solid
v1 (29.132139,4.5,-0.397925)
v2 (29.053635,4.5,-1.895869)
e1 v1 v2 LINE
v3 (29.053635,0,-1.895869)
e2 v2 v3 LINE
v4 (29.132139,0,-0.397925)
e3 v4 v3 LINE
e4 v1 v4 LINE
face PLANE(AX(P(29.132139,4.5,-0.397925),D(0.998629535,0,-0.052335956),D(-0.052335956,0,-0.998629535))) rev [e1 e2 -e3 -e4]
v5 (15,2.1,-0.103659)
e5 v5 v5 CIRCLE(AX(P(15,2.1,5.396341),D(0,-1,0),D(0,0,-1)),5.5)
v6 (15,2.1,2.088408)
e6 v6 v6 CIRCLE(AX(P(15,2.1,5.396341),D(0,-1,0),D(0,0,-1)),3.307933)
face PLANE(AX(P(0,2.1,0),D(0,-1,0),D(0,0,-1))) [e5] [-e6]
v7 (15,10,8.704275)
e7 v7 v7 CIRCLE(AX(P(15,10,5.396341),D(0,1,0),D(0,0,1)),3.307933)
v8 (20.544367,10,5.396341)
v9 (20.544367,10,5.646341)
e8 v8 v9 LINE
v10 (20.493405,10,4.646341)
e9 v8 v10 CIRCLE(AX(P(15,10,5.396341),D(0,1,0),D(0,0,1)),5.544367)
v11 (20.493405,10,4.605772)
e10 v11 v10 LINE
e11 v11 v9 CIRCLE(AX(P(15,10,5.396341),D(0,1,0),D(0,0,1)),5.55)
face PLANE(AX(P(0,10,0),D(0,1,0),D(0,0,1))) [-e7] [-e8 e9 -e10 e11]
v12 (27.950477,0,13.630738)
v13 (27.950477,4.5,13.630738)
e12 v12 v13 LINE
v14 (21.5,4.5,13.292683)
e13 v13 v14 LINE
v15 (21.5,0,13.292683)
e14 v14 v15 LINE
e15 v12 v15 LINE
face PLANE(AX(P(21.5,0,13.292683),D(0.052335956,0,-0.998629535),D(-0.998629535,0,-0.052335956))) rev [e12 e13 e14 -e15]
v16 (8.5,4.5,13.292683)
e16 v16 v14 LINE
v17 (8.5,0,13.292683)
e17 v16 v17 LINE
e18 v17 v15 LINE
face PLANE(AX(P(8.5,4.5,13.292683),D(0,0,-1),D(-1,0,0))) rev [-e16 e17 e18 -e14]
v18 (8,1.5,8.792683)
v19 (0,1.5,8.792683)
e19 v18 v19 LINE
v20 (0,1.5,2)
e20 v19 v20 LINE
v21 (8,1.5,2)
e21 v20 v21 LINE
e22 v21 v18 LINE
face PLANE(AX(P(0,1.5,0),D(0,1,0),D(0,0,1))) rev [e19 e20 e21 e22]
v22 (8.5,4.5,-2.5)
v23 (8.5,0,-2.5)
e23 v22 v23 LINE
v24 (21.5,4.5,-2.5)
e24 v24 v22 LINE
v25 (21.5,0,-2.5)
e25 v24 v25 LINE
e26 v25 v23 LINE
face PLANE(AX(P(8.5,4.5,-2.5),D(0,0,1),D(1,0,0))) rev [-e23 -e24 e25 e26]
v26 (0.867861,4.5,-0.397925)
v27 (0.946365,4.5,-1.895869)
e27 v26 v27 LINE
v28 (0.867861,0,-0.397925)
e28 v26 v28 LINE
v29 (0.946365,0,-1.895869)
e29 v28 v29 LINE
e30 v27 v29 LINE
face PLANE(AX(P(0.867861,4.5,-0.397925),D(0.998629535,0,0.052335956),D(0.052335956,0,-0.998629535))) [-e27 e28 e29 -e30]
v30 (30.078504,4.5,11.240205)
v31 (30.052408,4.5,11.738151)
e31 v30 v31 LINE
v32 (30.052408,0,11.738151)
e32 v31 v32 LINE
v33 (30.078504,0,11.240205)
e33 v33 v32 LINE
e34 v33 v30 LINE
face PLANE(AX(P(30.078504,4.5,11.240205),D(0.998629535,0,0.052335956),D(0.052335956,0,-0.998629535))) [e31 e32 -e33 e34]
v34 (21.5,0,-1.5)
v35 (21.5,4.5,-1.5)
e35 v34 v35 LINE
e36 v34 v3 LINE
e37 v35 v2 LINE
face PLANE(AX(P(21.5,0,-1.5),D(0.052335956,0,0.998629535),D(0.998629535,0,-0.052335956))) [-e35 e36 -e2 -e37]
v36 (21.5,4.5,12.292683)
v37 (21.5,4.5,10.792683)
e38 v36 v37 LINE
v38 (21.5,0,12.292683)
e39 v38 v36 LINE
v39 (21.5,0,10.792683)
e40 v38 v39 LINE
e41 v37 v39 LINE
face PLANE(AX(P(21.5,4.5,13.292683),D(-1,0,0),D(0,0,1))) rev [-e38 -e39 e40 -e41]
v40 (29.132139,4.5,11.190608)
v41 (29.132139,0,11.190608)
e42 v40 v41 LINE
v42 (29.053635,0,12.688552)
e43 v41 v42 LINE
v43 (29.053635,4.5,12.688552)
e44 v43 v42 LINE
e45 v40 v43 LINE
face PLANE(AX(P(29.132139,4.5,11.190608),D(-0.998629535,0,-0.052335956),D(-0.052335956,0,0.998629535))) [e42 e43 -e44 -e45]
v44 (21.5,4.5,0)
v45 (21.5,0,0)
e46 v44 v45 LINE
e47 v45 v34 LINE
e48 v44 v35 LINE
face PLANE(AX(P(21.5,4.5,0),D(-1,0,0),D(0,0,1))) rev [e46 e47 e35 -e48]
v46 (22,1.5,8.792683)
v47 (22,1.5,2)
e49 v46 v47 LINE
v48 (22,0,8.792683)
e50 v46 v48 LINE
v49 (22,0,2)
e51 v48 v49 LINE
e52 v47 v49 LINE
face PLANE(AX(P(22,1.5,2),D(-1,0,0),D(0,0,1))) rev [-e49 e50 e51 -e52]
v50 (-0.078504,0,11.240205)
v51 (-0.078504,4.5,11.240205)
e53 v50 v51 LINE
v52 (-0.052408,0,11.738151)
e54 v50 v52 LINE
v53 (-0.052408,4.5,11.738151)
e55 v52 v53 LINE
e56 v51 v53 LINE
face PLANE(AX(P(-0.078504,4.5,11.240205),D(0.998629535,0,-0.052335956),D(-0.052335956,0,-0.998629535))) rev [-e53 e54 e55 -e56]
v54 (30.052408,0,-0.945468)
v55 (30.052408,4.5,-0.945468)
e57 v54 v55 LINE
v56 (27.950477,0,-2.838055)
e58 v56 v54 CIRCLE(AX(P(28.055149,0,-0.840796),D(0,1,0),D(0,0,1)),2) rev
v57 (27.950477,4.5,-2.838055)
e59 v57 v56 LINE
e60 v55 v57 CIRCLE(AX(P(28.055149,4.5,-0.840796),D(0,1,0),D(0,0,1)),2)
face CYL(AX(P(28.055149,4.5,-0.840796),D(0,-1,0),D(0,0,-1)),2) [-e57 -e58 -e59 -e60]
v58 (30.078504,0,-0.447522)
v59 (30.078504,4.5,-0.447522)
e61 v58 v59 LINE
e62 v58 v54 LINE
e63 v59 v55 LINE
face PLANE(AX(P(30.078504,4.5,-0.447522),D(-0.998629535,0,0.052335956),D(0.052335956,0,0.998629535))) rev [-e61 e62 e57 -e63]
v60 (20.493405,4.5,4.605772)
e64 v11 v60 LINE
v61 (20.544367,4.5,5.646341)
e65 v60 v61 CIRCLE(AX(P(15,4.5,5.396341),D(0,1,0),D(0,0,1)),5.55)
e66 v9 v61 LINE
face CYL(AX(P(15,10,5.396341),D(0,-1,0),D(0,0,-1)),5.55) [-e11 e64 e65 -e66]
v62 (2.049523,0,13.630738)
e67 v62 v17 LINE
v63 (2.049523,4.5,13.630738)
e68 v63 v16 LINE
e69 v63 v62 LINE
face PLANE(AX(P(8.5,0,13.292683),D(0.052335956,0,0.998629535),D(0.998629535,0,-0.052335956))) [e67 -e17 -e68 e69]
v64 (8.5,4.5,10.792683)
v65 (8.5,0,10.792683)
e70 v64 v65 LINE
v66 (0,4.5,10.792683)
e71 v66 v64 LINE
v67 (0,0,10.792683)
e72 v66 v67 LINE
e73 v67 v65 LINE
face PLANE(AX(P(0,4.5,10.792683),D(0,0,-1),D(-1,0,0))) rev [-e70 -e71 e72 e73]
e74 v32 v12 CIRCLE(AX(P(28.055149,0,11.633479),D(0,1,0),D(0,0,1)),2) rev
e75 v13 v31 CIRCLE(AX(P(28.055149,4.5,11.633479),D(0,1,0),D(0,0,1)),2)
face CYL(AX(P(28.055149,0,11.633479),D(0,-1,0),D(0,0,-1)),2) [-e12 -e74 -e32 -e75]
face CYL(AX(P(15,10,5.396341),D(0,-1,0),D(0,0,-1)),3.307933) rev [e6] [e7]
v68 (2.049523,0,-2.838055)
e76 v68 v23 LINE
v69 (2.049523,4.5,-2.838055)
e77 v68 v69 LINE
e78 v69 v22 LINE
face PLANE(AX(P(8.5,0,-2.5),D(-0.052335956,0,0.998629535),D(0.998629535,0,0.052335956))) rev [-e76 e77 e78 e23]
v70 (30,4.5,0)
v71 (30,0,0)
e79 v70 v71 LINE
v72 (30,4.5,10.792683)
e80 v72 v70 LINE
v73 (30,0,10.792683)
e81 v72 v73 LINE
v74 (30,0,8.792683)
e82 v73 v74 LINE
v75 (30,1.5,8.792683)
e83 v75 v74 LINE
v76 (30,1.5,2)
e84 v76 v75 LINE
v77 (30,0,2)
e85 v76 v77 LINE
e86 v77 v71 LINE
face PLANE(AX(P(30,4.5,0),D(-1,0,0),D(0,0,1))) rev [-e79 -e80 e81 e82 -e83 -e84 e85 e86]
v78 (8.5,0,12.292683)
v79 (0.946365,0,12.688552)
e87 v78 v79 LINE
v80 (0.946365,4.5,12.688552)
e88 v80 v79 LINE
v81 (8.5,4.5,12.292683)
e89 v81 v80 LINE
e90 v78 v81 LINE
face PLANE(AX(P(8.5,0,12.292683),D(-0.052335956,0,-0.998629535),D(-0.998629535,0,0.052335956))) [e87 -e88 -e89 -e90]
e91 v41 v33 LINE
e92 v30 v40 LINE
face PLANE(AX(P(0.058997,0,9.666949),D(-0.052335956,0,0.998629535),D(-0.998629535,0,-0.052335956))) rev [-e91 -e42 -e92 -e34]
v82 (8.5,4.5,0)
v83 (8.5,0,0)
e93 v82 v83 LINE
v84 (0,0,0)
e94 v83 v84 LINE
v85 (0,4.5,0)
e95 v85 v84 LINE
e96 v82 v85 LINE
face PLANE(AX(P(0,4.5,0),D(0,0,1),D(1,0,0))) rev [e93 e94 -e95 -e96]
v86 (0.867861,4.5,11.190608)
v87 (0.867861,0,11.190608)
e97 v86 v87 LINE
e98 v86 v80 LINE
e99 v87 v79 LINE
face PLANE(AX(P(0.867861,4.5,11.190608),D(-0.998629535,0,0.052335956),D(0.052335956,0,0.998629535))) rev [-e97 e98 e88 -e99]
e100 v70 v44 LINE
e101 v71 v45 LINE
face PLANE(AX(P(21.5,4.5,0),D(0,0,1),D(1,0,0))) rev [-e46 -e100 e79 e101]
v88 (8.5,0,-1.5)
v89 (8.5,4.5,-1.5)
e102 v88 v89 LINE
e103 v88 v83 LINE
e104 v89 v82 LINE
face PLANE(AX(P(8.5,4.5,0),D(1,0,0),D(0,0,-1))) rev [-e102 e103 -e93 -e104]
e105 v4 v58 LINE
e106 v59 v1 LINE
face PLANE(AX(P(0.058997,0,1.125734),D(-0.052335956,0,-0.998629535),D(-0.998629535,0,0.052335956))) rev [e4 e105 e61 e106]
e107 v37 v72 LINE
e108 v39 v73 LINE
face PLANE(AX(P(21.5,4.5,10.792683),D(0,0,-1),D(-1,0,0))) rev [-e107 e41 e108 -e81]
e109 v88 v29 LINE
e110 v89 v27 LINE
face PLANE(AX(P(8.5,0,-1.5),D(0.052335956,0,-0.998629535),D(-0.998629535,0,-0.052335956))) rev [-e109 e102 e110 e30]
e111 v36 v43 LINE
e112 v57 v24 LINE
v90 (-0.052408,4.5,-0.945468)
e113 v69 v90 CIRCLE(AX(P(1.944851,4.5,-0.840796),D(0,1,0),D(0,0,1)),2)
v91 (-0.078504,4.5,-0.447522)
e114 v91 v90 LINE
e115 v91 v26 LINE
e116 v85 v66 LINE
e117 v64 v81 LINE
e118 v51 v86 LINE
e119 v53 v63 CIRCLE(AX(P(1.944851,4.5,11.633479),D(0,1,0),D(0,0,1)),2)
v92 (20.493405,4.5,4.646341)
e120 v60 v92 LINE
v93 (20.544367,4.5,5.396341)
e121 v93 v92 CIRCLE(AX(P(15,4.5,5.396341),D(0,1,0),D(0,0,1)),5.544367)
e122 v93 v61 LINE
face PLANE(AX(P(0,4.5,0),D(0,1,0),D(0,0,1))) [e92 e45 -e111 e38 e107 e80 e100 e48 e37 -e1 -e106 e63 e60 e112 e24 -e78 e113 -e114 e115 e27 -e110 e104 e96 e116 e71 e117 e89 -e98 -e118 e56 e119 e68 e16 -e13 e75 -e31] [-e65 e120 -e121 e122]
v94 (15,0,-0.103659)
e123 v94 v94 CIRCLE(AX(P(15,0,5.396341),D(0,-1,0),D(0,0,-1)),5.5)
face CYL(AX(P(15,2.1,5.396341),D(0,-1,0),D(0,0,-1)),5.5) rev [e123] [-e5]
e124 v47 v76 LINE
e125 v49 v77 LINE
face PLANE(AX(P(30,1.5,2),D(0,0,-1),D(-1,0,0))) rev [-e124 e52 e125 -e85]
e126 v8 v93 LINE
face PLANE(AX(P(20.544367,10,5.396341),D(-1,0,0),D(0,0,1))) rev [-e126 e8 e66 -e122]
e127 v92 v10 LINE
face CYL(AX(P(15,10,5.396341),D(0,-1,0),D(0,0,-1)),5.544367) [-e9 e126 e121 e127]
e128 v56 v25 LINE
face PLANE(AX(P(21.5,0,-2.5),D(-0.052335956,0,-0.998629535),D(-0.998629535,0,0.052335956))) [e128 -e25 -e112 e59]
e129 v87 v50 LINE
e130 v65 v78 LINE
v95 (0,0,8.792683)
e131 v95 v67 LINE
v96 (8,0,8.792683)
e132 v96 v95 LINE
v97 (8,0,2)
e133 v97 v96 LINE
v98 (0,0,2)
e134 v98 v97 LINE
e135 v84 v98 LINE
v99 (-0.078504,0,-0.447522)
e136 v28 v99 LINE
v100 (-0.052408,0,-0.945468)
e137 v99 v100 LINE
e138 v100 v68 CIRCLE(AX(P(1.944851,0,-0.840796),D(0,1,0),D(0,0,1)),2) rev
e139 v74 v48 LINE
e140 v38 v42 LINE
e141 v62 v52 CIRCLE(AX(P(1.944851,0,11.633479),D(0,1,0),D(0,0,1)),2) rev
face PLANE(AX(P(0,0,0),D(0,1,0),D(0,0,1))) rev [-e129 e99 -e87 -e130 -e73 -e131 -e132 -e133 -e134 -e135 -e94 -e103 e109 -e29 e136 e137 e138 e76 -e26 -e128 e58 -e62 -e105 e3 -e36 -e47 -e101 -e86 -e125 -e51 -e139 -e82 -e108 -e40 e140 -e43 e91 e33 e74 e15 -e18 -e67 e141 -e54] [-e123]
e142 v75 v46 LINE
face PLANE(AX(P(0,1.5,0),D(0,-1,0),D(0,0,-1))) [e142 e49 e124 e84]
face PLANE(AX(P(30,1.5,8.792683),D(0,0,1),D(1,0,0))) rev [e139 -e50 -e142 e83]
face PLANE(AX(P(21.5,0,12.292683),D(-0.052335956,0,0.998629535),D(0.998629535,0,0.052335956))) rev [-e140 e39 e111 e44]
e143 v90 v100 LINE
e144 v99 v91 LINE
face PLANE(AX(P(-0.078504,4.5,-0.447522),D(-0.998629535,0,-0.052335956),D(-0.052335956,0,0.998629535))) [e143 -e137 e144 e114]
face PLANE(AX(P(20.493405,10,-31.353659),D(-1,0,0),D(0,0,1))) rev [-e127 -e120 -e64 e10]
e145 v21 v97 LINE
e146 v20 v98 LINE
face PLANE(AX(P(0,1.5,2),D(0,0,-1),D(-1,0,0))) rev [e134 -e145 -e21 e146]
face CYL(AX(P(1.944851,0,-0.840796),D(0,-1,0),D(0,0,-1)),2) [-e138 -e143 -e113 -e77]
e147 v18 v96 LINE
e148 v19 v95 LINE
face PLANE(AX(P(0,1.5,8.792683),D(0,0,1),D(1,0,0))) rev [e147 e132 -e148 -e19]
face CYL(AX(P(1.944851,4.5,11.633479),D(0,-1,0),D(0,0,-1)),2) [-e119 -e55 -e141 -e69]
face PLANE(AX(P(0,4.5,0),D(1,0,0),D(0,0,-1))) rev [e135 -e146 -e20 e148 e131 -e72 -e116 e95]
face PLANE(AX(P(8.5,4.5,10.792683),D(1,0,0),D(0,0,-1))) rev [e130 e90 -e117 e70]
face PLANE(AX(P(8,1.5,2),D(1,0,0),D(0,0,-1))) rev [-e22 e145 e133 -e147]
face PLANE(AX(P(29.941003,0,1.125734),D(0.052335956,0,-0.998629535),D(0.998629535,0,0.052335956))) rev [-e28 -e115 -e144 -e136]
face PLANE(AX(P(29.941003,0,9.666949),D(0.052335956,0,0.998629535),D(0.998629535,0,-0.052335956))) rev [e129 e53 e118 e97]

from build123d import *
from build123d.topology import SkipClean

# Parameters (mm, degrees)
BOSS_EXTRU_1_DEPTH       = 4.5
BOSS_EXTRU_2_DEPTH       = 5.5
ENL_V_MAT_EXTRU_3_DEPTH  = 2.1
ENL_V_START              = -13.1
ESQUISSE7_R              = 3
ENL_V_MAT_EXTRU_4_DEPTH  = 13.1
ESQUISSE18_W             = 8
ESQUISSE18_H             = 6.792682927
ENL_V_MAT_EXTRU_5_DEPTH  = 1.5
ESQUISSE19_W             = 8
ESQUISSE19_H             = 6.792682927
ENL_V_MAT_EXTRU_6_DEPTH  = 1.5
BOSS_EXTRU_11_DEPTH      = 4.5
ESQUISSE25_W             = 0.947664044
ESQUISSE25_H             = 4.5
BOSS_EXTRU_12_DEPTH      = 1.5
CONG_16_R                = 2
BOSS_EXTRU_16_DEPTH      = 1
ENL_V_MAT_EXTRU_7_DEPTH  = 0.25
CONG_16_OF_SYM_TRIE4_R   = 2
SYM_TRIE5_DEPTH          = 4.5
ESQUISSE34_W             = 0.75
ESQUISSE34_H             = 11.333514389
ENL_V_MAT_EXTRU_10_DEPTH = 36
ESQUISSE35_R             = 5.54436651
ESQUISSE35_R_2           = 3
BOSS_EXTRU_19_DEPTH      = 5.5
ESQUISSE36_W             = 0.010434814
ESQUISSE36_H             = 5.5
ENL_V_MAT_EXTRU_11_DEPTH = 0.25
BOSS_EXTRU_20_DEPTH      = 5.5
ESQUISSE38_W             = 0.005685697
ESQUISSE38_H             = 5.5
ENL_V_MAT_EXTRU_12_DEPTH = 36
ESQUISSE39_R             = 3.307933445
ENL_V_MAT_EXTRU_13_DEPTH = 5.5
ENL_V_START_2            = -36
ESQUISSE40_R             = 3.307933445
ENL_V_MAT_EXTRU_14_DEPTH = 36


with BuildPart() as part:
    # Esquisse1 → Boss.-Extru.1 (new body)
    with BuildSketch(Plane(origin=(0, 0, 0), x_dir=(1, 0, 0), z_dir=(0, 1, 0))):
        Polygon((21.5, 0), (21.5, 2.5), (8.5, 2.5), (8.5, 0), (0, 0), (0, -10.792682927), (8.5, -10.792682927), (8.5, -13.292682927), (21.5, -13.292682927), (21.5, -10.792682927), (30, -10.792682927), (30, 0), align=None)
    extrude(amount=BOSS_EXTRU_1_DEPTH)

    # Esquisse2 → Boss.-Extru.2 (add)
    with BuildSketch(Plane(origin=(0, 4.5, 0), x_dir=(1, 0, 0), z_dir=(0, 1, 0))):
        with BuildLine():
            ThreePointArc((20.55, -5.396341463), (16.884536839, -0.176090425), (10.729812288, -1.851204385))
            Line((10.729812288, -1.851204385), (12.691790426, -3.480051151))
            ThreePointArc((12.691790426, -3.480051151), (16.018668562, -2.574584145), (18, -5.396341463))
            ThreePointArc((18, -5.396341463), (17.821757318, -6.415010025), (17.308209574, -7.312631776))
            Line((17.308209574, -7.312631776), (19.270187712, -8.941478542))
            ThreePointArc((19.270187712, -8.941478542), (20.220251038, -7.280878303), (20.55, -5.396341463))
        make_face()
        with BuildLine():
            Line((12.691790426, -3.480051151), (10.729812288, -1.851204385))
            ThreePointArc((10.729812288, -1.851204385), (11.454862922, -9.666529176), (19.270187712, -8.941478542))
            Line((19.270187712, -8.941478542), (17.308209574, -7.312631776))
            ThreePointArc((17.308209574, -7.312631776), (13.083709687, -7.704551038), (12.691790426, -3.480051151))
        make_face()
        with BuildLine():
            ThreePointArc((20.55, -5.396341463), (16.884536839, -0.176090425), (10.729812288, -1.851204385))
            Line((10.729812288, -1.851204385), (12.691790426, -3.480051151))
            ThreePointArc((12.691790426, -3.480051151), (16.018668562, -2.574584145), (18, -5.396341463))
            ThreePointArc((18, -5.396341463), (17.821757318, -6.415010025), (17.308209574, -7.312631776))
            Line((17.308209574, -7.312631776), (19.270187712, -8.941478542))
            ThreePointArc((19.270187712, -8.941478542), (20.220251038, -7.280878303), (20.55, -5.396341463))
        make_face()
        with BuildLine():
            Line((12.691790426, -3.480051151), (10.729812288, -1.851204385))
            ThreePointArc((10.729812288, -1.851204385), (11.454862922, -9.666529176), (19.270187712, -8.941478542))
            Line((19.270187712, -8.941478542), (17.308209574, -7.312631776))
            ThreePointArc((17.308209574, -7.312631776), (13.083709687, -7.704551038), (12.691790426, -3.480051151))
        make_face()
    extrude(amount=BOSS_EXTRU_2_DEPTH)

    # Esquisse5 → Enlèv. mat.-Extru.3 (cut)
    with BuildSketch(Plane.XZ):
        with BuildLine():
            ThreePointArc((20.5, 5.396341463), (16.86755903, 10.569563213), (10.768282447, 8.90954037))
            Line((10.768282447, 8.90954037), (19.231717553, 1.883142557))
            ThreePointArc((19.231717553, 1.883142557), (20.17322175, 3.528782433), (20.5, 5.396341463))
        make_face()
        with BuildLine():
            Line((19.231717553, 1.883142557), (10.768282447, 8.90954037))
            ThreePointArc((10.768282447, 8.90954037), (11.486801094, 1.164623911), (19.231717553, 1.883142557))
        make_face()
        with BuildLine():
            ThreePointArc((20.5, 5.396341463), (16.86755903, 10.569563213), (10.768282447, 8.90954037))
            Line((10.768282447, 8.90954037), (19.231717553, 1.883142557))
            ThreePointArc((19.231717553, 1.883142557), (20.17322175, 3.528782433), (20.5, 5.396341463))
        make_face()
        with BuildLine():
            Line((19.231717553, 1.883142557), (10.768282447, 8.90954037))
            ThreePointArc((10.768282447, 8.90954037), (11.486801094, 1.164623911), (19.231717553, 1.883142557))
        make_face()
    extrude(amount=-ENL_V_MAT_EXTRU_3_DEPTH, mode=Mode.SUBTRACT)

    # Esquisse7 → Enlèv. mat.-Extru.4 (cut)
    with BuildSketch(Plane(origin=(0, 4.5, 0), x_dir=(1, 0, 0), z_dir=(0, 1, 0)).offset(ENL_V_START)):
        with Locations(Location((15, -5.396341463, 0), (0, 0, 90))):
            Circle(ESQUISSE7_R)
    extrude(amount=ENL_V_MAT_EXTRU_4_DEPTH, mode=Mode.SUBTRACT)

    # Esquisse18 → Enlèv. mat.-Extru.5 (cut)
    with BuildSketch(Plane.XZ):
        with Locations((26, 5.396341464)):
            Rectangle(ESQUISSE18_W, ESQUISSE18_H)
    extrude(amount=-ENL_V_MAT_EXTRU_5_DEPTH, mode=Mode.SUBTRACT)

    # Esquisse19 → Enlèv. mat.-Extru.6 (cut)
    with BuildSketch(Plane.XZ):
        with Locations((4, 5.396341464)):
            Rectangle(ESQUISSE19_W, ESQUISSE19_H)
    extrude(amount=-ENL_V_MAT_EXTRU_6_DEPTH, mode=Mode.SUBTRACT)

    # Esquisse23 → Boss.-Extru.11 (add)
    with BuildSketch(Plane(origin=(0, 4.5, 0), x_dir=(1, 0, 0), z_dir=(0, 1, 0))):
        Polygon((21.5, 2.5), (30, 2.945466124), (30, 1.945466124), (21.5, 1.5), align=None)
    boss_extru_11 = extrude(amount=-BOSS_EXTRU_11_DEPTH)

    # Esquisse25 → Boss.-Extru.12 (add)
    with BuildSketch(Plane(origin=(-0.019506723, 0, -0.372210441), x_dir=(0.998629534754574, 0, -0.05233595624294039), z_dir=(0.05233595624294039, 0, 0.9986295347545742))):
        with Locations((29.586871851, 2.25)):
            Rectangle(ESQUISSE25_W, ESQUISSE25_H)
    boss_extru_12 = extrude(amount=BOSS_EXTRU_12_DEPTH)

    # Congé16
    cong_16_edges = [part.edges().sort_by_distance(p)[0] for p in [
        (30, 2.25, -2.945466124),
    ]]
    fillet(cong_16_edges, radius=CONG_16_R)

    # Esquisse3D3 → Boss.-Extru.16 (add)
    with SkipClean():  # the faces are left unmerged after this step: merging them gives an invalid solid
        with BuildSketch(Plane(origin=(15, 4.5, 5.646341463), x_dir=(0.9055110385022749, 0.42432270638104186, 1.6236855905047217e-15), z_dir=(0, 0, -1))):
            Polygon((0, 0), (21.900590549, 10.262622385), (26.709658048, 0), (4.809067498, -10.262622385), align=None)
        extrude(amount=BOSS_EXTRU_16_DEPTH)

    # Esquisse29 → Enlèv. mat.-Extru.7 (cut)
    with BuildSketch(Plane.XY.offset(5.646341463)):
        Polygon((17.989565186, 4.5), (17.989565186, 10), (20.54436651, 10), (20.54436651, 4.5), (30, 4.5), (39.185890197, 4.5), (39.185890197, 15.833514389), (15, 15.833514389), (15, 4.5), align=None)
    extrude(amount=-ENL_V_MAT_EXTRU_7_DEPTH, mode=Mode.SUBTRACT)

    # Symétrie4: Boss.-Extru.11, Boss.-Extru.12 across plane
    add(boss_extru_11.mirror(Plane.XY.offset(5.396341463)))
    add(boss_extru_12.mirror(Plane.XY.offset(5.396341463)))

    # Congé16 of Symétrie4
    cong_16_of_sym_trie4_edges = [part.edges().sort_by_distance(p)[0] for p in [
        (30, 2.25, 13.738149051),
    ]]
    fillet(cong_16_of_sym_trie4_edges, radius=CONG_16_OF_SYM_TRIE4_R)

    # Symétrie5: read off the stored shape, not the designer's step
    # Symétrie5 outline → Symétrie5 (add)
    with BuildSketch(Plane(origin=(0, 0, 0), x_dir=(1, 0, 0), z_dir=(0, 1, 0))):
        with BuildLine():
            Line((8.5, -13.292682927), (8.5, -12.292682927))
            Line((8.5, -12.292682927), (0.946365303, -12.688552147))
            Line((0.946365303, -12.688552147), (0.867861369, -11.190607845))
            Line((0.867861369, -11.190607845), (-0.078503934, -11.240204749))
            Line((-0.078503934, -11.240204749), (-0.052407681, -11.738150929))
            ThreePointArc((-0.052407681, -11.738150929), (0.606590176, -13.119768667), (2.049523301, -13.630738086))
            Line((2.049523301, -13.630738086), (8.5, -13.292682927))
        make_face()
        with BuildLine():
            Line((0.946365303, 1.89586922), (8.5, 1.5))
            Line((8.5, 1.5), (8.5, 2.5))
            Line((8.5, 2.5), (2.049523301, 2.838055159))
            ThreePointArc((2.049523301, 2.838055159), (0.606590176, 2.327085741), (-0.052407681, 0.945468002))
            Line((-0.052407681, 0.945468002), (-0.078503934, 0.447521822))
            Line((-0.078503934, 0.447521822), (0.867861369, 0.397924918))
            Line((0.867861369, 0.397924918), (0.946365303, 1.89586922))
        make_face()
    extrude(amount=SYM_TRIE5_DEPTH)

    # Esquisse34 → Enlèv. mat.-Extru.10 (cut)
    with SkipClean():  # the faces are left unmerged after this step: merging them gives an invalid solid
        with BuildSketch(Plane.ZY.offset(-15)):
            with Locations((5.021341463, 10.166757195)):
                Rectangle(ESQUISSE34_W, ESQUISSE34_H)
        extrude(amount=-ENL_V_MAT_EXTRU_10_DEPTH, mode=Mode.SUBTRACT)

    # Esquisse35 → Boss.-Extru.19 (add)
    with BuildSketch(Plane(origin=(0, 4.5, 0), x_dir=(1, 0, 0), z_dir=(0, 1, 0))):
        with Locations((15, -5.396341463)):
            Circle(ESQUISSE35_R)
        with Locations(Location((15, -5.396341463, 0), (0, 0, 90))):
            Circle(ESQUISSE35_R_2, mode=Mode.SUBTRACT)
    extrude(amount=BOSS_EXTRU_19_DEPTH)

    # Esquisse36 → Enlèv. mat.-Extru.11 (cut)
    with SkipClean():  # the faces are left unmerged after this step: merging them gives an invalid solid
        with BuildSketch(Plane(origin=(0, 0, 5.396341463), x_dir=(-1, 0, 0), z_dir=(0, 0, -1))):
            with Locations((-17.994782593, 7.25)):
                Rectangle(ESQUISSE36_W, ESQUISSE36_H)
        extrude(amount=-ENL_V_MAT_EXTRU_11_DEPTH, mode=Mode.SUBTRACT)

    # Esquisse37 → Boss.-Extru.20 (add)
    with SkipClean():  # the faces are left unmerged after this step: merging them gives an invalid solid
        with BuildSketch(Plane(origin=(0, 4.5, 0), x_dir=(1, 0, 0), z_dir=(0, 1, 0))):
            with BuildLine():
                Line((17.989565186, -5.646341463), (18, -5.646341463))
                Line((18, -5.646341463), (18, -5.396341463))
                ThreePointArc((18, -5.396341463), (17.997390161, -5.521450301), (17.989565186, -5.646341463))
            make_face()
        extrude(amount=BOSS_EXTRU_20_DEPTH)

    # Esquisse38 → Enlèv. mat.-Extru.12 (cut)
    with SkipClean():  # the faces are left unmerged after this step: merging them gives an invalid solid
        with BuildSketch(Plane.XY.offset(4.646341463)):
            with Locations((20.496247985, 7.25)):
                Rectangle(ESQUISSE38_W, ESQUISSE38_H)
        extrude(amount=-ENL_V_MAT_EXTRU_12_DEPTH, mode=Mode.SUBTRACT)

    # Esquisse39 → Enlèv. mat.-Extru.13 (cut)
    with BuildSketch(Plane(origin=(0, 4.5, 0), x_dir=(1, 0, 0), z_dir=(0, 1, 0))):
        with Locations(Location((15, -5.396341463, 0), (0, 0, 270))):
            Circle(ESQUISSE39_R)
    extrude(amount=ENL_V_MAT_EXTRU_13_DEPTH, mode=Mode.SUBTRACT)

    # Esquisse40 → Enlèv. mat.-Extru.14 (cut)
    with BuildSketch(Plane(origin=(0, 4.5, 0), x_dir=(1, 0, 0), z_dir=(0, 1, 0)).offset(ENL_V_START_2)):
        with Locations(Location((15, -5.396341463, 0), (0, 0, 90))):
            Circle(ESQUISSE40_R)
    extrude(amount=ENL_V_MAT_EXTRU_14_DEPTH, mode=Mode.SUBTRACT)


solid = part.part
